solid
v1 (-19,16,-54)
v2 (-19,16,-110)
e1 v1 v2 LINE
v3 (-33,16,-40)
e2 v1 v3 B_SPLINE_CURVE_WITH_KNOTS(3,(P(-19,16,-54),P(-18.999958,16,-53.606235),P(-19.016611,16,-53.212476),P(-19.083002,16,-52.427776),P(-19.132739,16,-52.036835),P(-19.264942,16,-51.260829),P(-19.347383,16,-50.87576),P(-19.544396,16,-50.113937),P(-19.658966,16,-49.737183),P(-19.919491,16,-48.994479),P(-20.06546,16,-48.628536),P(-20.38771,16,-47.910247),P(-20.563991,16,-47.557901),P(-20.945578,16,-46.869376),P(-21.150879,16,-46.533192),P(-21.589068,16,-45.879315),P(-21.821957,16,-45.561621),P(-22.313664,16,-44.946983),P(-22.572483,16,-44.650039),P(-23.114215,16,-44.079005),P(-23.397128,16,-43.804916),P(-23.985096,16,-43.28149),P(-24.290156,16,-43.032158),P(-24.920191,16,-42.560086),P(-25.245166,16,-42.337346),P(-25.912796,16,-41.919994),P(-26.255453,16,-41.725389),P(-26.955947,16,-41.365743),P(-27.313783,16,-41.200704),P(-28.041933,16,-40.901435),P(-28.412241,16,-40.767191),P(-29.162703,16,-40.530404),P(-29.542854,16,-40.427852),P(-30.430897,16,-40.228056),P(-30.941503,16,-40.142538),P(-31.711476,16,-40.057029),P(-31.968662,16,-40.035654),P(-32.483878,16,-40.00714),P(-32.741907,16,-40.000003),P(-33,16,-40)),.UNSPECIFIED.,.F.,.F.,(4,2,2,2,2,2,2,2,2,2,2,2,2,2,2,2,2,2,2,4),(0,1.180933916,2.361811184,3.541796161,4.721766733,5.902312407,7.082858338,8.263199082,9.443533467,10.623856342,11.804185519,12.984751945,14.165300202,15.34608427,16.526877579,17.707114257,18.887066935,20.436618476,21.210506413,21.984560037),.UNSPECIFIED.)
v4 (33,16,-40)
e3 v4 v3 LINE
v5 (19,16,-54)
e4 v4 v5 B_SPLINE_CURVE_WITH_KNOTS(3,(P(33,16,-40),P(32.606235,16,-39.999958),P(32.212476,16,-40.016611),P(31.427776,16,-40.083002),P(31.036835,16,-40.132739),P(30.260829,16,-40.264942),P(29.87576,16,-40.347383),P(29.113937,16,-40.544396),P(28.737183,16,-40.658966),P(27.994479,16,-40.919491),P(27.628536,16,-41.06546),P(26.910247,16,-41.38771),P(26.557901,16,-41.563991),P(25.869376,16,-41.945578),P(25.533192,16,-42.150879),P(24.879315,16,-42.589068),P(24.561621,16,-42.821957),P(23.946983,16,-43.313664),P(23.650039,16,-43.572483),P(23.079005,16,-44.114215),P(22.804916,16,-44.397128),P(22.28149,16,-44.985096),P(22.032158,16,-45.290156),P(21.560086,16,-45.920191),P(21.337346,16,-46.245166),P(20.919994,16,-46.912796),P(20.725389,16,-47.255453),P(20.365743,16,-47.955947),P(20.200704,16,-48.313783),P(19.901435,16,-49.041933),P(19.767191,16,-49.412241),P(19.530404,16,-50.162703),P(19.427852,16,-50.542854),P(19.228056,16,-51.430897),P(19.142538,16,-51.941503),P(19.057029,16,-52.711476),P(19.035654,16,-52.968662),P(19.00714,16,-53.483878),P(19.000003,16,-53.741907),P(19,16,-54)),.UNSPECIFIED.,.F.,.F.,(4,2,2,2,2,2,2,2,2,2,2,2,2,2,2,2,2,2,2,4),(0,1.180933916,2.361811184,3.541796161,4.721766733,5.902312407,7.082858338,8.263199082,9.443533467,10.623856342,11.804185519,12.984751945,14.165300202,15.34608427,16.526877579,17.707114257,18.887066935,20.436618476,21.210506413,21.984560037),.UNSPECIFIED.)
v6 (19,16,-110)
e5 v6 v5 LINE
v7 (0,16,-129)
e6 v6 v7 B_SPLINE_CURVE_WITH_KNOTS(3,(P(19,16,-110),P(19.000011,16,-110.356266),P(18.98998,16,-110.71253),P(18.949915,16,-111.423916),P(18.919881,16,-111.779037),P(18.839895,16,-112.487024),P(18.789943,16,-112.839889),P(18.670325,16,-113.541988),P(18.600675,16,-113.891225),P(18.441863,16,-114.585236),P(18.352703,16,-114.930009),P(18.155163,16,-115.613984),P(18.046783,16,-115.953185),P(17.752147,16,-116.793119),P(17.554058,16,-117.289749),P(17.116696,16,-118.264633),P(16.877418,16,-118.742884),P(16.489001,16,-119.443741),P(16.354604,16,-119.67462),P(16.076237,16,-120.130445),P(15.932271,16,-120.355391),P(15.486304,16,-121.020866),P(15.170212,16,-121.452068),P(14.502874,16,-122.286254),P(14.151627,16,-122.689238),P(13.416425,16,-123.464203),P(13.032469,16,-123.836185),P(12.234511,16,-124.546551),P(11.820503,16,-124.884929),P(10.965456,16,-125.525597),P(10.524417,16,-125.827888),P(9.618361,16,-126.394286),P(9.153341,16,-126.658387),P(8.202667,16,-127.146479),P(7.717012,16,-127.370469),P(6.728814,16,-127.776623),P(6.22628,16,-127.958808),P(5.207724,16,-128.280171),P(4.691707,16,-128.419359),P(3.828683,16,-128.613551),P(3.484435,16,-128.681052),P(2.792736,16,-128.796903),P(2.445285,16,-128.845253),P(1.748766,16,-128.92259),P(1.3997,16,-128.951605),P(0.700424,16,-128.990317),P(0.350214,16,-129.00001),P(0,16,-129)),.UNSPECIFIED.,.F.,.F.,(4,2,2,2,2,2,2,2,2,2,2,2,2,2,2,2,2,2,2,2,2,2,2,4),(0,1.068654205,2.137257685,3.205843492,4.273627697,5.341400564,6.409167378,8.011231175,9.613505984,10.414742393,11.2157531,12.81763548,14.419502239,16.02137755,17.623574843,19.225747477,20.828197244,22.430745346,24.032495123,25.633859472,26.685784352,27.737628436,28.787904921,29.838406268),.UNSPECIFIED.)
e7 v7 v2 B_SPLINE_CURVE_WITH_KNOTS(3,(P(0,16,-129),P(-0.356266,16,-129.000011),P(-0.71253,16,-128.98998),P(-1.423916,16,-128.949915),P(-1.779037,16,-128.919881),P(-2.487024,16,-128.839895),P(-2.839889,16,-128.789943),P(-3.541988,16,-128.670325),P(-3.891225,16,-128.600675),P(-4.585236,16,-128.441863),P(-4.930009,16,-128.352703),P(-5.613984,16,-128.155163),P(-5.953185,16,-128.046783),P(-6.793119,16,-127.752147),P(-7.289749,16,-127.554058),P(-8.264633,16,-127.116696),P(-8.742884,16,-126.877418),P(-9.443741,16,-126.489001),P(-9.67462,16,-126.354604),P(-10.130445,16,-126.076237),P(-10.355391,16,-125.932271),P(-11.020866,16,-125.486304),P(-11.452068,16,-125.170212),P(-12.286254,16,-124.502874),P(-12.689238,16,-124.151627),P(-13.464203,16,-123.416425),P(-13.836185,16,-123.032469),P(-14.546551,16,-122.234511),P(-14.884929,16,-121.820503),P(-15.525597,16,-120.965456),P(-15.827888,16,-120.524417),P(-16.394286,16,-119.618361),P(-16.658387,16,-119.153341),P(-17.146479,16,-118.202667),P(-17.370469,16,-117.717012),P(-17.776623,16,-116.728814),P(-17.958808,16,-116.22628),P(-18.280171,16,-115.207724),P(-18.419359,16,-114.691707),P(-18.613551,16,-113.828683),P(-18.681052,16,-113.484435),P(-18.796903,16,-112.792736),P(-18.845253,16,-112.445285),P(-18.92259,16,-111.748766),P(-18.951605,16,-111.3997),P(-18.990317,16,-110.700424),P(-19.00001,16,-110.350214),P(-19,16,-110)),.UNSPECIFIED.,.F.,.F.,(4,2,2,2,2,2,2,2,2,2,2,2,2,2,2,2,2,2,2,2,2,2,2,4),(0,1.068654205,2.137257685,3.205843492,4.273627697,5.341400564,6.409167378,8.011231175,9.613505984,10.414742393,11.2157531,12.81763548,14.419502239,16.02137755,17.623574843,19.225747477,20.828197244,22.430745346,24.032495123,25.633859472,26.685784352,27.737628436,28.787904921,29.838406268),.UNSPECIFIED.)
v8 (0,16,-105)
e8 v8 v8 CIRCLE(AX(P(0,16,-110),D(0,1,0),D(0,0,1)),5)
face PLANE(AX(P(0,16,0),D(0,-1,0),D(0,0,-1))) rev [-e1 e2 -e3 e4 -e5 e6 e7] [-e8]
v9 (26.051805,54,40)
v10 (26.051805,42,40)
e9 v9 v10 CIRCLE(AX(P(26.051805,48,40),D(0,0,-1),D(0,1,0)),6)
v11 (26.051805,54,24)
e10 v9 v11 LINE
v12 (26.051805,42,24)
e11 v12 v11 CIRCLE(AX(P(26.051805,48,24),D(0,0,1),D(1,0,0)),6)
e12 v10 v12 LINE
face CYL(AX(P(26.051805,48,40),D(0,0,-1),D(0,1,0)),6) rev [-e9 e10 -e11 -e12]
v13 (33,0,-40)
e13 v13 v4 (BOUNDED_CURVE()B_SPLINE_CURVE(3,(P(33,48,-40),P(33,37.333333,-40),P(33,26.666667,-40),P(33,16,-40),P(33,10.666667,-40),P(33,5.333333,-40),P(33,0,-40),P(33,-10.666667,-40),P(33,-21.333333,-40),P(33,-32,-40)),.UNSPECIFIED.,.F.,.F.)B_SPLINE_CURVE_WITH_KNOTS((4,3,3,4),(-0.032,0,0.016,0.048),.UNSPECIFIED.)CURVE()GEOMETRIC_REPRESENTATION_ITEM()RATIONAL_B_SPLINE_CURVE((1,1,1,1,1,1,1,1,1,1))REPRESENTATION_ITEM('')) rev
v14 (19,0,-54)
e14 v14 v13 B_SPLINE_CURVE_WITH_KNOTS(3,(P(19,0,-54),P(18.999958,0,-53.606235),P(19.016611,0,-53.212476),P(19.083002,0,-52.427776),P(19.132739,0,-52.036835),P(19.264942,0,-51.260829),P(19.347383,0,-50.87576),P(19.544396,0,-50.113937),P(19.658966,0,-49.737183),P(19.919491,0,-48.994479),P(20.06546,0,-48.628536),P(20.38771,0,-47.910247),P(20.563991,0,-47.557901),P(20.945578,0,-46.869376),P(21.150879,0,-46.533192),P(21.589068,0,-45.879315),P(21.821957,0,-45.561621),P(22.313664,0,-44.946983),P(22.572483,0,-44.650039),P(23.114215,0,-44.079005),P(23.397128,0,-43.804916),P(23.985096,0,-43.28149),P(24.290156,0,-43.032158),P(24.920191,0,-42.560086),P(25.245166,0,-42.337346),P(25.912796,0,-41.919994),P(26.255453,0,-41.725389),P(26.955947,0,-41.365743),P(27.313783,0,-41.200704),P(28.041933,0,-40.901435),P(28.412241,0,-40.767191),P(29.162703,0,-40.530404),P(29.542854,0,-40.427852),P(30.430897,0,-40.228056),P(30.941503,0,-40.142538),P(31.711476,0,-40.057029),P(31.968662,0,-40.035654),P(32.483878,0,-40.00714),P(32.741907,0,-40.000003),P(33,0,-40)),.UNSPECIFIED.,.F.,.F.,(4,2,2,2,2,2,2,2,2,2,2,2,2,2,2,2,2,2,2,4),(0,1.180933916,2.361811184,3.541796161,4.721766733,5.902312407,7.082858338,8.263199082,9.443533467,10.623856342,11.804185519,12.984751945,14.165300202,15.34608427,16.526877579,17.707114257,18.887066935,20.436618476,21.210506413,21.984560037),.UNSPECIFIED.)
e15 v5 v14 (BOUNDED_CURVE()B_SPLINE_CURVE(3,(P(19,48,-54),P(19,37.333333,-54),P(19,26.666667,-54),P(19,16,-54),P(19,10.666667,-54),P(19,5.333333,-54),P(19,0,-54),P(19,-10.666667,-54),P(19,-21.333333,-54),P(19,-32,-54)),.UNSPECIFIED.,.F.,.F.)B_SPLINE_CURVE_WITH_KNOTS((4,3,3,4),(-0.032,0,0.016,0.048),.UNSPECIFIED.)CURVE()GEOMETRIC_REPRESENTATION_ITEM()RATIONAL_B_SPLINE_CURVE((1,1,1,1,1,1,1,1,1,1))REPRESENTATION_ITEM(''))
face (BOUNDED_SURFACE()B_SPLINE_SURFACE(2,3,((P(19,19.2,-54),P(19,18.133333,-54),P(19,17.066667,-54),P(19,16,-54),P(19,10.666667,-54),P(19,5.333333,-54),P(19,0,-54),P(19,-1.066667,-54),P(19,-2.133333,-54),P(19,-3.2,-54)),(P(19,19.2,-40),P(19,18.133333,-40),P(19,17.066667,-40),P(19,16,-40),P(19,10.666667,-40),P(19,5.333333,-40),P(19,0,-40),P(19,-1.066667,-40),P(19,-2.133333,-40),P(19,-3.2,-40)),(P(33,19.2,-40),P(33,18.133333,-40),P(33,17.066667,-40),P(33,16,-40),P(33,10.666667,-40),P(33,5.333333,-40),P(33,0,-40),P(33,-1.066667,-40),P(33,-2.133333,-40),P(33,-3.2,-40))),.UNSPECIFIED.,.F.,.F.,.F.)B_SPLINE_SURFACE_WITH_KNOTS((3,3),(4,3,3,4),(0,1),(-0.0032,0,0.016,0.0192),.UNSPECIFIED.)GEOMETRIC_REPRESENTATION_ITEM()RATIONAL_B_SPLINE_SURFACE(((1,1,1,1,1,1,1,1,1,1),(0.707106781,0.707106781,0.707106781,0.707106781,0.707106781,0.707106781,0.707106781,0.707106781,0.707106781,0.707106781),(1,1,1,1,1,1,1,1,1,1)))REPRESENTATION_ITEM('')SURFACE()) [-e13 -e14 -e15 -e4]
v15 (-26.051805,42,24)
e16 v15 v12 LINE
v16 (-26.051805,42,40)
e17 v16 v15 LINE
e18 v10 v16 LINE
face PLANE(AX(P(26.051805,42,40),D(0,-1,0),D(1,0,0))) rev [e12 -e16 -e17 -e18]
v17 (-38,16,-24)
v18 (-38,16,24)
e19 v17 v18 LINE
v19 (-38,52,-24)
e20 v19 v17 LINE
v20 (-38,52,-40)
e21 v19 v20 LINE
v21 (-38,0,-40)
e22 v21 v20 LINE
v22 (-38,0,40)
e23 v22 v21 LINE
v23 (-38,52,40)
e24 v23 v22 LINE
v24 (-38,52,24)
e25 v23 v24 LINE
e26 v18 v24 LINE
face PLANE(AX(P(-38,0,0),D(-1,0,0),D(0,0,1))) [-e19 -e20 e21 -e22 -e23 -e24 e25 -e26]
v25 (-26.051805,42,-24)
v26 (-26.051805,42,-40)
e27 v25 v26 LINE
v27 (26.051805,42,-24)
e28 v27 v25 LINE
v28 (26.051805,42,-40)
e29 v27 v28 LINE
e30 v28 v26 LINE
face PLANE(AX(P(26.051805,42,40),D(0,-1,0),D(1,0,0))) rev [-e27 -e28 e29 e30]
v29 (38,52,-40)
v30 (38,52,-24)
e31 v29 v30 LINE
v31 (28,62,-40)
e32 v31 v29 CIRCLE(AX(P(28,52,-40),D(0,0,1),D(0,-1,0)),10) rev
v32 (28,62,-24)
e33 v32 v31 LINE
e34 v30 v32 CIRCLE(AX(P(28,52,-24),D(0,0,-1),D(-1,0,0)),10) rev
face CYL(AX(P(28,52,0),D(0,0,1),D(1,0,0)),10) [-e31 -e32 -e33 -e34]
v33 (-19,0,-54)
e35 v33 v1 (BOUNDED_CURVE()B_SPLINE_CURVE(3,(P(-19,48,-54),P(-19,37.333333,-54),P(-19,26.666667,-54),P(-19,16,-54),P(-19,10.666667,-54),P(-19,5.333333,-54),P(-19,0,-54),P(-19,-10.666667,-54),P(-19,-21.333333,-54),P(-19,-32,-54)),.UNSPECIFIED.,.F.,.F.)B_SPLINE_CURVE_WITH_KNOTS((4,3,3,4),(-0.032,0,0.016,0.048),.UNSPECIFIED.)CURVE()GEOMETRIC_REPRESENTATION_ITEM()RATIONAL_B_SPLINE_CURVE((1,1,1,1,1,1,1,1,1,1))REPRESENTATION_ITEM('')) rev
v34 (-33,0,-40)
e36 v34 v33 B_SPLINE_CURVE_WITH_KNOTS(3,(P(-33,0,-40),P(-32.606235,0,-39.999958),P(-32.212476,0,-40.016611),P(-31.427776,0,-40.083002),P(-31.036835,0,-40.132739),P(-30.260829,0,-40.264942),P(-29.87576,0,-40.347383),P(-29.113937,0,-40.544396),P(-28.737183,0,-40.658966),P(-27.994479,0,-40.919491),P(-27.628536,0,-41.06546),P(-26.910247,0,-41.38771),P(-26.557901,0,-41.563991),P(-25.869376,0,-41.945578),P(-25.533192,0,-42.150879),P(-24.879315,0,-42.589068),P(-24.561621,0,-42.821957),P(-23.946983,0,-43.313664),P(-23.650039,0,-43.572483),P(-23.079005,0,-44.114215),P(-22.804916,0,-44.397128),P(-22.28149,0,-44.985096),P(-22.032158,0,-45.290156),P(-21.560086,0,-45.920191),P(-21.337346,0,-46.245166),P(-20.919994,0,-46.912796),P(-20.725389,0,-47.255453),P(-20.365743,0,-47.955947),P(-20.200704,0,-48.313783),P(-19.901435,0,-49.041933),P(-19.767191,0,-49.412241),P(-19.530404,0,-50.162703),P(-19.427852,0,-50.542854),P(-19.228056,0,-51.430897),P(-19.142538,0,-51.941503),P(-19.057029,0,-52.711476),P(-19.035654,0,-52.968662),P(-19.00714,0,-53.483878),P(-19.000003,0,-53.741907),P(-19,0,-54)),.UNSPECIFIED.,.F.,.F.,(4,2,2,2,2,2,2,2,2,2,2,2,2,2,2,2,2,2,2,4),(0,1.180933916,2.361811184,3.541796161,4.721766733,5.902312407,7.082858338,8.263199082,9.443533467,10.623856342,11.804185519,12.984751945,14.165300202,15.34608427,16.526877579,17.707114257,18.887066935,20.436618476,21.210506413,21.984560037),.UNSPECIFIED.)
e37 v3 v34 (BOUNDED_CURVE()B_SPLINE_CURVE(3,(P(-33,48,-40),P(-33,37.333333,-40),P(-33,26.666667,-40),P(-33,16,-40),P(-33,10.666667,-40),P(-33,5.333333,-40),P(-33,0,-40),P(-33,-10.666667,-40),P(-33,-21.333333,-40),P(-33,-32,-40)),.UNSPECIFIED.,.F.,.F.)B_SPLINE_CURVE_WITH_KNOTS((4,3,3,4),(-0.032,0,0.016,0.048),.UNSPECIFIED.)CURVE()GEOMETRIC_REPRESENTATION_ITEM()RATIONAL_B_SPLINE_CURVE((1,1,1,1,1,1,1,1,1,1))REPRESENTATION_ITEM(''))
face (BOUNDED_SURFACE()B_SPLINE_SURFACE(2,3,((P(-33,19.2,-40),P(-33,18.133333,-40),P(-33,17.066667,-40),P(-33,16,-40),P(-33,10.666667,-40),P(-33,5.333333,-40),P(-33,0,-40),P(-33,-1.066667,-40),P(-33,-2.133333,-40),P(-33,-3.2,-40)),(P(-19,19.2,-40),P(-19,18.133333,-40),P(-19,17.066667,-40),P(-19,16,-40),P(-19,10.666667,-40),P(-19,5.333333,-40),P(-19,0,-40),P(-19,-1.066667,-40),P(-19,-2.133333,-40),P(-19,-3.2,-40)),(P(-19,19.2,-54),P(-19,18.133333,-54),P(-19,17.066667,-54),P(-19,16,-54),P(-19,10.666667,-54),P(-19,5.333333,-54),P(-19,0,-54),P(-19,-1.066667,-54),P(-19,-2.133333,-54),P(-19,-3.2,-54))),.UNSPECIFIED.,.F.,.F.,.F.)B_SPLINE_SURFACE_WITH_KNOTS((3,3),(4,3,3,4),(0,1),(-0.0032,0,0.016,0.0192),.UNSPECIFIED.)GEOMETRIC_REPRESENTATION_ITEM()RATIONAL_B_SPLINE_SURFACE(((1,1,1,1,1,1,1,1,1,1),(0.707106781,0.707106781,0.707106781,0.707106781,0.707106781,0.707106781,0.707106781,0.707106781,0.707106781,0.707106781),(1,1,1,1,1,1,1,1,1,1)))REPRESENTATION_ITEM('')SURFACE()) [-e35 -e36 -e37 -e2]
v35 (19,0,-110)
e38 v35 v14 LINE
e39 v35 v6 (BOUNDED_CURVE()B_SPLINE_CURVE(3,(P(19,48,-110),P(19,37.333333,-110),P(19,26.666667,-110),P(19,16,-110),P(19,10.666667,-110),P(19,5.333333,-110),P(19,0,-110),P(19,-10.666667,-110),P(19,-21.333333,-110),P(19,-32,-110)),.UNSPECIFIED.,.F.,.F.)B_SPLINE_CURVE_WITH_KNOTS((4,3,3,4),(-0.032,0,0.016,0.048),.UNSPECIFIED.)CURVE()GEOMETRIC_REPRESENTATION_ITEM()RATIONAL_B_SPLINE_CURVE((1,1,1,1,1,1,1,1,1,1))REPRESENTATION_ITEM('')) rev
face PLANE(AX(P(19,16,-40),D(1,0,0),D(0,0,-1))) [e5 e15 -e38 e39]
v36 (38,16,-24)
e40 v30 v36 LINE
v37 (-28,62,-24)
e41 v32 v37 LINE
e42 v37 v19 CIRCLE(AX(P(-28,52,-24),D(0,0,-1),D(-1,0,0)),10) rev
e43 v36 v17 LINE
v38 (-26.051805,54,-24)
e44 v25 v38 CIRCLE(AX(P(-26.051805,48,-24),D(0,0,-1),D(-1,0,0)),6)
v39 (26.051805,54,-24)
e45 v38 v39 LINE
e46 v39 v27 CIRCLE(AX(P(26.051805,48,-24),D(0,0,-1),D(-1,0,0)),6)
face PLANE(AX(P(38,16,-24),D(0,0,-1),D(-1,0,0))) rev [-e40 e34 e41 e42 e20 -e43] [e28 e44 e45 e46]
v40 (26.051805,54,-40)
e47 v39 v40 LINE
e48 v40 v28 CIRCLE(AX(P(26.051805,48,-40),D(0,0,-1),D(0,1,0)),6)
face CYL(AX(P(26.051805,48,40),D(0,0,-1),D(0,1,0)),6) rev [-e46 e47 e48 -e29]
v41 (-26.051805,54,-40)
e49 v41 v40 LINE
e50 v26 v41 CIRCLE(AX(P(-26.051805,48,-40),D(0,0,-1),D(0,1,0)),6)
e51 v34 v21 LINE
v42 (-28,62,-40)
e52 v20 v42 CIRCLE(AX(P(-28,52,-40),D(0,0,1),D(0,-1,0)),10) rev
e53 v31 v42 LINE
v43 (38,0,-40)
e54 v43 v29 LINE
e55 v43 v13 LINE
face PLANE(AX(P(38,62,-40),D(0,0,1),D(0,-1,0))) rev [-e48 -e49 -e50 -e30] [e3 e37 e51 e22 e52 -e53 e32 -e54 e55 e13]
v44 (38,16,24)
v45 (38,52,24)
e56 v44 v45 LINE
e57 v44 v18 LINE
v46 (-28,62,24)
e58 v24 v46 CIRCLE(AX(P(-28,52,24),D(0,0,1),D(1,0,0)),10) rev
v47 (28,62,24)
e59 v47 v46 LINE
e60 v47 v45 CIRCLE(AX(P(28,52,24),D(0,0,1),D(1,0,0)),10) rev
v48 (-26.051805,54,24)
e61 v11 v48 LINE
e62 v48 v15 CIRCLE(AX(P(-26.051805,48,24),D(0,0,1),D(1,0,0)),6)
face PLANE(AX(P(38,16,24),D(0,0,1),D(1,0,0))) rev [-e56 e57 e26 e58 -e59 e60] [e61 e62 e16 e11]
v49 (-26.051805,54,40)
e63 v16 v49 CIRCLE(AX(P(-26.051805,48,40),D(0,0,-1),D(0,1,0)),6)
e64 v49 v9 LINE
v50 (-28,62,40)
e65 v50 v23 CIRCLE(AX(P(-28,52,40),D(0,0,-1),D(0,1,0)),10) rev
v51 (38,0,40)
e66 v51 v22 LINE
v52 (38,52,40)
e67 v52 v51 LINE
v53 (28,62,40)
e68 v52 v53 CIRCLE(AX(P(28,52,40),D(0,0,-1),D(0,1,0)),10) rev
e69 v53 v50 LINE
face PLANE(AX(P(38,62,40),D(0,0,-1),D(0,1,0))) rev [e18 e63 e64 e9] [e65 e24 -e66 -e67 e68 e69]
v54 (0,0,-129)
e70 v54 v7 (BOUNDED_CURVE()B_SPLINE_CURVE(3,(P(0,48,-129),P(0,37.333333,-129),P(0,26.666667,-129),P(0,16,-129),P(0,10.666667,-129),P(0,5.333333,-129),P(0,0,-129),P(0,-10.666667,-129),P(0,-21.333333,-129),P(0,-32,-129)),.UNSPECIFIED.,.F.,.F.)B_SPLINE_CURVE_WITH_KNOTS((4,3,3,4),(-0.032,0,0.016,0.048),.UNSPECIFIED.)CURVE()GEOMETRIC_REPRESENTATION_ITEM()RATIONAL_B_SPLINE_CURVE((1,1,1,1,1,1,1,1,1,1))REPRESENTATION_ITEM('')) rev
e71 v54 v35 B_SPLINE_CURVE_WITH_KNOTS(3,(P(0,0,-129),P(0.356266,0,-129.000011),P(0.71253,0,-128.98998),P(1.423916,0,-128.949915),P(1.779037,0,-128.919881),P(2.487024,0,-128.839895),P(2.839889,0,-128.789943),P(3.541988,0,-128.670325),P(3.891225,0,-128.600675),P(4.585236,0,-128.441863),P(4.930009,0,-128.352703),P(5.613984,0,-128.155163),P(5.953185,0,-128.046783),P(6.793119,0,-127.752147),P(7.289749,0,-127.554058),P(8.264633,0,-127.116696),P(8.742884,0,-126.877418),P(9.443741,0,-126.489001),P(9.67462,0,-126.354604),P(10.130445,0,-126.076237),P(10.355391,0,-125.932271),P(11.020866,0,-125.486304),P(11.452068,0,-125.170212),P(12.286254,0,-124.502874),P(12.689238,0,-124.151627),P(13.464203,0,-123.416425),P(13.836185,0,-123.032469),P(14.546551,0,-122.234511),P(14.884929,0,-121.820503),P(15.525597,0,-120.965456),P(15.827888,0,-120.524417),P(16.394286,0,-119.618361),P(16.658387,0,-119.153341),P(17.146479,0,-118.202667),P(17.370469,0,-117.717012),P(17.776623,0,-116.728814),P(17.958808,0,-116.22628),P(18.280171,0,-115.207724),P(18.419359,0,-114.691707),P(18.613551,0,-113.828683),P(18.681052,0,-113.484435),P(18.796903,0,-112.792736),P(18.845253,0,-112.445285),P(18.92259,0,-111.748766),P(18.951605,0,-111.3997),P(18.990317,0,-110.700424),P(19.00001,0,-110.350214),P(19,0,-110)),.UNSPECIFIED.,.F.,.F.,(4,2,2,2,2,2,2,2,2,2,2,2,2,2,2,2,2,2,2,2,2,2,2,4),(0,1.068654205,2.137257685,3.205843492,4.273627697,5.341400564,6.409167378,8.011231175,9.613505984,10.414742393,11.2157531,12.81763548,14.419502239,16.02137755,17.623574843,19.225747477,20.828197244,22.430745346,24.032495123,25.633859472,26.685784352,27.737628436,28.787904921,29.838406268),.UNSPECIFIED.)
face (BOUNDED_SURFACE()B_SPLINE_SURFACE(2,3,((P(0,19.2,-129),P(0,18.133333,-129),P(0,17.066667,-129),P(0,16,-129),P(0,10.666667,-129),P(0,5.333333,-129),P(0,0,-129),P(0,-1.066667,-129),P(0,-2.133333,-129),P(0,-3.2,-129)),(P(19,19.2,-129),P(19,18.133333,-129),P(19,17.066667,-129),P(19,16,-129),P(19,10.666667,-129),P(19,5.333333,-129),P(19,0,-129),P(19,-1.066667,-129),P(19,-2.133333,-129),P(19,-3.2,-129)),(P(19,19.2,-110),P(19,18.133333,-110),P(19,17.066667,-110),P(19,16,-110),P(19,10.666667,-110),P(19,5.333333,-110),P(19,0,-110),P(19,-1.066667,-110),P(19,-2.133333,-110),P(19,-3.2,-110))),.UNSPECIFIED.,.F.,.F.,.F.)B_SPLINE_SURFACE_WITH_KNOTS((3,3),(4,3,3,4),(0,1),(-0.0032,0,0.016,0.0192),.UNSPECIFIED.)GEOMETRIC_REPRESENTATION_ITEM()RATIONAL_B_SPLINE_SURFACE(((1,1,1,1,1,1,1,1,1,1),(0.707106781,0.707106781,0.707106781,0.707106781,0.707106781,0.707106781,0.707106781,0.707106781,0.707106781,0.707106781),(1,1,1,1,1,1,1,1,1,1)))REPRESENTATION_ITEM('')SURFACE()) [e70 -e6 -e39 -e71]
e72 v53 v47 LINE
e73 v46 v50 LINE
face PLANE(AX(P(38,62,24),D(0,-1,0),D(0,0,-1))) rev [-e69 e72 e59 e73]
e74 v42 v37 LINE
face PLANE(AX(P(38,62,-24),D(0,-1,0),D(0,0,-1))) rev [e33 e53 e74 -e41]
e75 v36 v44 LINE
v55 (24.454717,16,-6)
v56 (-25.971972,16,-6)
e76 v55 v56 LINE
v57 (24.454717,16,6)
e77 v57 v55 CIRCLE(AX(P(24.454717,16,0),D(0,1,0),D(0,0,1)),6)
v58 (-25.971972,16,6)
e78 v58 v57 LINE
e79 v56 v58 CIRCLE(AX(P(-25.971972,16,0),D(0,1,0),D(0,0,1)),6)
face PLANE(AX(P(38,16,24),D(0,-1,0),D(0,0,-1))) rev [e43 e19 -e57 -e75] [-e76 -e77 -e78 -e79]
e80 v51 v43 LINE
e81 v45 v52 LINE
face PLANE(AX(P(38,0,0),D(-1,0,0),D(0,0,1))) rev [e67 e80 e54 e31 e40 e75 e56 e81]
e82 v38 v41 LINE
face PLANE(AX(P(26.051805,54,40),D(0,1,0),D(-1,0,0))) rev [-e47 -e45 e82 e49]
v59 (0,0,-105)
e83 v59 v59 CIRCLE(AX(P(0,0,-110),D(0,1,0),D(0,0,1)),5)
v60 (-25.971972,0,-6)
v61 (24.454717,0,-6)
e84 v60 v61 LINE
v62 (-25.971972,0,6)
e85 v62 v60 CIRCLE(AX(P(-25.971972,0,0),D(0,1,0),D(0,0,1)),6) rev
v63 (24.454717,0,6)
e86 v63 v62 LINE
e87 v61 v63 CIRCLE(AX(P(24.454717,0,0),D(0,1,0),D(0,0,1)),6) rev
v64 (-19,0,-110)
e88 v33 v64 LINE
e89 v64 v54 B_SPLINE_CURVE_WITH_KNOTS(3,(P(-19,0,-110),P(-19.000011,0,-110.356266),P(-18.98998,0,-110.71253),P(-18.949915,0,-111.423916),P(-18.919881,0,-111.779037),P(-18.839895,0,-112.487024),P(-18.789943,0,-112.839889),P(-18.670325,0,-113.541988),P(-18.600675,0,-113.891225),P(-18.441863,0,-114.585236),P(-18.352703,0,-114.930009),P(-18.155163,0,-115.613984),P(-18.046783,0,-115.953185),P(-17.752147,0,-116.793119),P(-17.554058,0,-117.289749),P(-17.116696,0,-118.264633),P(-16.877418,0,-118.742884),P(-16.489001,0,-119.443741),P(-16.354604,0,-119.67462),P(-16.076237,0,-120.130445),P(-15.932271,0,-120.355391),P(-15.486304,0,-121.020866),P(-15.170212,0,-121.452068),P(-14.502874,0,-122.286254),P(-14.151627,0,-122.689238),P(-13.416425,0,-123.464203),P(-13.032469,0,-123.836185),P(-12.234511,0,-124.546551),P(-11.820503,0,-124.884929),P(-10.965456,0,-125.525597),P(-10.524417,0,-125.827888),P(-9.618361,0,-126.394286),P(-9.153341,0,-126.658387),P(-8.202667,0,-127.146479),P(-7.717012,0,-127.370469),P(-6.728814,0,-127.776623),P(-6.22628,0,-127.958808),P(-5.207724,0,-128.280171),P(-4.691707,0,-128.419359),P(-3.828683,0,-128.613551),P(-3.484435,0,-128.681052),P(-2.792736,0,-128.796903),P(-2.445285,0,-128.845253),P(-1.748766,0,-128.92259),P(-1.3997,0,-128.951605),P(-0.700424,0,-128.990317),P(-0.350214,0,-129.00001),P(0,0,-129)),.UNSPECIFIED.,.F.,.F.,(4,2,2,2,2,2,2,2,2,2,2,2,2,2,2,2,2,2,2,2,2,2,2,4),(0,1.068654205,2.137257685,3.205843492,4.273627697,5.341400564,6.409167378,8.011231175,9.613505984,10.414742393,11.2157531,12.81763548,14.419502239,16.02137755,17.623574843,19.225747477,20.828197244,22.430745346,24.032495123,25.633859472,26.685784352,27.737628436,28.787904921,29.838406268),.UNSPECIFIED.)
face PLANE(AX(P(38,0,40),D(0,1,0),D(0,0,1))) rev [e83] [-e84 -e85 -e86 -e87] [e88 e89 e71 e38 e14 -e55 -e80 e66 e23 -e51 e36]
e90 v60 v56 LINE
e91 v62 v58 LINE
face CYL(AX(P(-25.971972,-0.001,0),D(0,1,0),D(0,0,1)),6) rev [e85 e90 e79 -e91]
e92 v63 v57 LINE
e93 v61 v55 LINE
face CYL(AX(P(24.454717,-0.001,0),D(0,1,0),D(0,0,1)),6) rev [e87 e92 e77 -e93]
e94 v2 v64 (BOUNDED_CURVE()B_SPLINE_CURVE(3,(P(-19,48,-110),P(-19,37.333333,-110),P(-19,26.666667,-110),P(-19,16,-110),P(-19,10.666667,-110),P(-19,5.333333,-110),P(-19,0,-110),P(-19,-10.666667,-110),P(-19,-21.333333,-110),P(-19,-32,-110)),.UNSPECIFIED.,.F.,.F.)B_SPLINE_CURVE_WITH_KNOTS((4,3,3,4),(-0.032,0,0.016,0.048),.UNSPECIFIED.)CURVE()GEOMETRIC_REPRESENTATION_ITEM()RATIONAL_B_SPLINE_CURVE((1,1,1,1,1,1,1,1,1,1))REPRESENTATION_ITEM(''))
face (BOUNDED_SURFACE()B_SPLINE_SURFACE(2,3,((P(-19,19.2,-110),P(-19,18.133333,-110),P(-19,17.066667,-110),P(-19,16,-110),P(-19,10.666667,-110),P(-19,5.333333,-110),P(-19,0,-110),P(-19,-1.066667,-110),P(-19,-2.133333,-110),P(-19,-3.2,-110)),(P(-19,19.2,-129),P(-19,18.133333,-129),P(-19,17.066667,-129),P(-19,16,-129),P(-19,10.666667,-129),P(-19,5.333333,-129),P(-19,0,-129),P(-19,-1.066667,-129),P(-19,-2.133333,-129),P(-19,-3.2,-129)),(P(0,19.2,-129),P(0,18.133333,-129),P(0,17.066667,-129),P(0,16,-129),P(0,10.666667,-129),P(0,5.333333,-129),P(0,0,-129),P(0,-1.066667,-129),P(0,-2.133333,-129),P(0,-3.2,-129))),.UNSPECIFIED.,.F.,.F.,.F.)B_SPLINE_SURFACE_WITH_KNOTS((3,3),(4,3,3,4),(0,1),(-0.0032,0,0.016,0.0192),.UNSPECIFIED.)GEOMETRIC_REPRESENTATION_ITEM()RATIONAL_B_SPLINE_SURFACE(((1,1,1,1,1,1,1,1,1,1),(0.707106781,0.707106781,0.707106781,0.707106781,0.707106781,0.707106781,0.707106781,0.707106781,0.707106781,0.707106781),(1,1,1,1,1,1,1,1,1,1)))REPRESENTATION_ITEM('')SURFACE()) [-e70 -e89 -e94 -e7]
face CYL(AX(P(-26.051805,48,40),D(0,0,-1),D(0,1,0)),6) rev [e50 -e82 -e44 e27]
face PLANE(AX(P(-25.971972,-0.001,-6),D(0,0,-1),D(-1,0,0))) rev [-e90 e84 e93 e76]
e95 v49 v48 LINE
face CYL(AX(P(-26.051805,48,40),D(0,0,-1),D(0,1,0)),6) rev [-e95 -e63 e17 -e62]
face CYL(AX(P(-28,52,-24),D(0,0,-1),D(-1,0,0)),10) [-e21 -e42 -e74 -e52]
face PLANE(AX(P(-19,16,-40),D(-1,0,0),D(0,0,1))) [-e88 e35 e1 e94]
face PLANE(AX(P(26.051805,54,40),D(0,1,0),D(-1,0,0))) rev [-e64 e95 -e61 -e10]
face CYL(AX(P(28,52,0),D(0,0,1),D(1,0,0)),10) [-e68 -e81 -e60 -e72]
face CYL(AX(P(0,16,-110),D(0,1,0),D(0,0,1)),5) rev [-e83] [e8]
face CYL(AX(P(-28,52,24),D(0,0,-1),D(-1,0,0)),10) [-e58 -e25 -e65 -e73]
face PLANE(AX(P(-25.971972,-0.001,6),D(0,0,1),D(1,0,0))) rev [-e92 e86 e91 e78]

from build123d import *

# Parameters (mm, degrees)
ESTRUSIONE_ESTRUSIONE1_DEPTH = 38
RACCORDO1_R                  = 10
SCHIZZO3_W                   = 38
SCHIZZO3_H                   = 89
ESTRUSIONE_ESTRUSIONE2_DEPTH = 16
RACCORDO3_START              = -1
RACCORDO3_DEPTH              = 18
RACCORDO4_DEPTH              = 16
FORO_10_0_10_1_D             = 10
FORO_10_0_10_1_ON_FACE_2_D   = 10
TAGLIO_ESTRUSIONE1_DEPTH     = 115.93041384
TAGLIO_ESTRUSIONE2_REACH     = 144.13


with BuildPart() as part:
    # Schizzo2 → Estrusione-Estrusione1 (new, symmetric)
    with BuildSketch(Plane(origin=(0, 0, 0), x_dir=(0, 0, -1), z_dir=(1, 0, 0))):
        Polygon((-24, 16), (-24, 62), (-40, 62), (-40, 0), (40, 0), (40, 62), (24, 62), (24, 16), align=None)
    extrude(amount=ESTRUSIONE_ESTRUSIONE1_DEPTH, both=True)

    # Raccordo1
    raccordo1_edges = [part.edges().sort_by_distance(p)[0] for p in [
        (-38, 62, -32),
        (38, 62, -32),
        (38, 62, 32),
        (-38, 62, 32),
    ]]
    fillet(raccordo1_edges, radius=RACCORDO1_R)

    # Schizzo3 → Estrusione-Estrusione2 (add)
    with BuildSketch(Plane.XZ):
        with Locations((0, -84.5)):
            Rectangle(SCHIZZO3_W, SCHIZZO3_H)
    extrude(amount=-ESTRUSIONE_ESTRUSIONE2_DEPTH)

    # Raccordo3: read off the stored shape, not the designer's step
    # Raccordo3 outline → Raccordo3 (cut)
    with BuildSketch(Plane(origin=(0, 0, 0), x_dir=(1, 0, 0), z_dir=(0, 1, 0)).offset(RACCORDO3_START)):
        with BuildLine():
            Line((-19, 129), (-19, 110))
            add(Edge.make_bspline(
                [(-19, 110), (-19, 129), (0, 129)],
                knots=[0, 0, 0, 1, 1, 1], degree=2, weights=[1, 0.707106781, 1]))
            Line((0, 129), (-19, 129))
        make_face()
        with BuildLine():
            Line((19, 129), (0, 129))
            add(Edge.make_bspline(
                [(0, 129), (19, 129), (19, 110)],
                knots=[0, 0, 0, 1, 1, 1], degree=2, weights=[1, 0.707106781, 1]))
            Line((19, 110), (19, 129))
        make_face()
    extrude(amount=RACCORDO3_DEPTH, mode=Mode.SUBTRACT)

    # Raccordo4: read off the stored shape, not the designer's step
    # Raccordo4 outline → Raccordo4 (add)
    with BuildSketch(Plane(origin=(0, 0, 0), x_dir=(1, 0, 0), z_dir=(0, 1, 0))):
        with BuildLine():
            Line((19, 54), (19, 40))
            Line((19, 40), (33, 40))
            add(Edge.make_bspline(
                [(19, 54), (19, 40), (33, 40)],
                knots=[0, 0, 0, 1, 1, 1], degree=2, weights=[1, 0.707106781, 1]))
        make_face()
        with BuildLine():
            add(Edge.make_bspline(
                [(-33, 40), (-19, 40), (-19, 54)],
                knots=[0, 0, 0, 1, 1, 1], degree=2, weights=[1, 0.707106781, 1]))
            Line((-33, 40), (-19, 40))
            Line((-19, 40), (-19, 54))
        make_face()
    extrude(amount=RACCORDO4_DEPTH)

    # Foro Ø10.0 (10)-1 (through all)
    with Locations(Plane(origin=(4.7e-08, 16, -110.000000174), x_dir=(0, 0, 1), z_dir=(0, 1, 0))):
        with Locations((0, 0)):
            Hole(FORO_10_0_10_1_D / 2)

    # Foro Ø10.0 (10)-1 on face 2 (through all)
    with Locations(Plane(origin=(0, 0, -110), x_dir=(0, 0, -1), z_dir=(0, -1, 0))):
        with Locations((0, 0)):
            Hole(FORO_10_0_10_1_ON_FACE_2_D / 2)

    # Schizzo5 → Taglio-Estrusione1 (cut, through all)
    with BuildSketch(Plane(origin=(0, 0, -40), x_dir=(-1, 0, 0), z_dir=(0, 0, -1))):
        with BuildLine():
            Line((-26.051804846, 54), (26.051804846, 54))
            ThreePointArc((26.051804846, 54), (32.051804846, 48), (26.051804846, 42))
            Line((26.051804846, 42), (-26.051804846, 42))
            ThreePointArc((-26.051804846, 42), (-32.051804846, 48), (-26.051804846, 54))
        make_face()
    extrude(amount=-TAGLIO_ESTRUSIONE1_DEPTH, mode=Mode.SUBTRACT)

    # Schizzo6 → Taglio-Estrusione2 (cut, up to next)
    with BuildSketch(Plane(origin=(0, 16, 0), x_dir=(1, 0, 0), z_dir=(0, 1, 0)), mode=Mode.PRIVATE) as taglio_estrusione2_sk1:
        with BuildLine():
            Line((-25.97197238, 6), (24.454717483, 6))
            ThreePointArc((24.454717483, 6), (30.454717483, 0), (24.454717483, -6))
            Line((24.454717483, -6), (-25.97197238, -6))
            ThreePointArc((-25.97197238, -6), (-31.97197238, 0), (-25.97197238, 6))
        make_face()
    taglio_estrusione2_tool1 = extrude(taglio_estrusione2_sk1.sketch, amount=-TAGLIO_ESTRUSIONE2_REACH, mode=Mode.PRIVATE) & part.part
    add(taglio_estrusione2_tool1.solids().sort_by_distance((-0.758627, 16, 0))[0], mode=Mode.SUBTRACT)


solid = part.part
